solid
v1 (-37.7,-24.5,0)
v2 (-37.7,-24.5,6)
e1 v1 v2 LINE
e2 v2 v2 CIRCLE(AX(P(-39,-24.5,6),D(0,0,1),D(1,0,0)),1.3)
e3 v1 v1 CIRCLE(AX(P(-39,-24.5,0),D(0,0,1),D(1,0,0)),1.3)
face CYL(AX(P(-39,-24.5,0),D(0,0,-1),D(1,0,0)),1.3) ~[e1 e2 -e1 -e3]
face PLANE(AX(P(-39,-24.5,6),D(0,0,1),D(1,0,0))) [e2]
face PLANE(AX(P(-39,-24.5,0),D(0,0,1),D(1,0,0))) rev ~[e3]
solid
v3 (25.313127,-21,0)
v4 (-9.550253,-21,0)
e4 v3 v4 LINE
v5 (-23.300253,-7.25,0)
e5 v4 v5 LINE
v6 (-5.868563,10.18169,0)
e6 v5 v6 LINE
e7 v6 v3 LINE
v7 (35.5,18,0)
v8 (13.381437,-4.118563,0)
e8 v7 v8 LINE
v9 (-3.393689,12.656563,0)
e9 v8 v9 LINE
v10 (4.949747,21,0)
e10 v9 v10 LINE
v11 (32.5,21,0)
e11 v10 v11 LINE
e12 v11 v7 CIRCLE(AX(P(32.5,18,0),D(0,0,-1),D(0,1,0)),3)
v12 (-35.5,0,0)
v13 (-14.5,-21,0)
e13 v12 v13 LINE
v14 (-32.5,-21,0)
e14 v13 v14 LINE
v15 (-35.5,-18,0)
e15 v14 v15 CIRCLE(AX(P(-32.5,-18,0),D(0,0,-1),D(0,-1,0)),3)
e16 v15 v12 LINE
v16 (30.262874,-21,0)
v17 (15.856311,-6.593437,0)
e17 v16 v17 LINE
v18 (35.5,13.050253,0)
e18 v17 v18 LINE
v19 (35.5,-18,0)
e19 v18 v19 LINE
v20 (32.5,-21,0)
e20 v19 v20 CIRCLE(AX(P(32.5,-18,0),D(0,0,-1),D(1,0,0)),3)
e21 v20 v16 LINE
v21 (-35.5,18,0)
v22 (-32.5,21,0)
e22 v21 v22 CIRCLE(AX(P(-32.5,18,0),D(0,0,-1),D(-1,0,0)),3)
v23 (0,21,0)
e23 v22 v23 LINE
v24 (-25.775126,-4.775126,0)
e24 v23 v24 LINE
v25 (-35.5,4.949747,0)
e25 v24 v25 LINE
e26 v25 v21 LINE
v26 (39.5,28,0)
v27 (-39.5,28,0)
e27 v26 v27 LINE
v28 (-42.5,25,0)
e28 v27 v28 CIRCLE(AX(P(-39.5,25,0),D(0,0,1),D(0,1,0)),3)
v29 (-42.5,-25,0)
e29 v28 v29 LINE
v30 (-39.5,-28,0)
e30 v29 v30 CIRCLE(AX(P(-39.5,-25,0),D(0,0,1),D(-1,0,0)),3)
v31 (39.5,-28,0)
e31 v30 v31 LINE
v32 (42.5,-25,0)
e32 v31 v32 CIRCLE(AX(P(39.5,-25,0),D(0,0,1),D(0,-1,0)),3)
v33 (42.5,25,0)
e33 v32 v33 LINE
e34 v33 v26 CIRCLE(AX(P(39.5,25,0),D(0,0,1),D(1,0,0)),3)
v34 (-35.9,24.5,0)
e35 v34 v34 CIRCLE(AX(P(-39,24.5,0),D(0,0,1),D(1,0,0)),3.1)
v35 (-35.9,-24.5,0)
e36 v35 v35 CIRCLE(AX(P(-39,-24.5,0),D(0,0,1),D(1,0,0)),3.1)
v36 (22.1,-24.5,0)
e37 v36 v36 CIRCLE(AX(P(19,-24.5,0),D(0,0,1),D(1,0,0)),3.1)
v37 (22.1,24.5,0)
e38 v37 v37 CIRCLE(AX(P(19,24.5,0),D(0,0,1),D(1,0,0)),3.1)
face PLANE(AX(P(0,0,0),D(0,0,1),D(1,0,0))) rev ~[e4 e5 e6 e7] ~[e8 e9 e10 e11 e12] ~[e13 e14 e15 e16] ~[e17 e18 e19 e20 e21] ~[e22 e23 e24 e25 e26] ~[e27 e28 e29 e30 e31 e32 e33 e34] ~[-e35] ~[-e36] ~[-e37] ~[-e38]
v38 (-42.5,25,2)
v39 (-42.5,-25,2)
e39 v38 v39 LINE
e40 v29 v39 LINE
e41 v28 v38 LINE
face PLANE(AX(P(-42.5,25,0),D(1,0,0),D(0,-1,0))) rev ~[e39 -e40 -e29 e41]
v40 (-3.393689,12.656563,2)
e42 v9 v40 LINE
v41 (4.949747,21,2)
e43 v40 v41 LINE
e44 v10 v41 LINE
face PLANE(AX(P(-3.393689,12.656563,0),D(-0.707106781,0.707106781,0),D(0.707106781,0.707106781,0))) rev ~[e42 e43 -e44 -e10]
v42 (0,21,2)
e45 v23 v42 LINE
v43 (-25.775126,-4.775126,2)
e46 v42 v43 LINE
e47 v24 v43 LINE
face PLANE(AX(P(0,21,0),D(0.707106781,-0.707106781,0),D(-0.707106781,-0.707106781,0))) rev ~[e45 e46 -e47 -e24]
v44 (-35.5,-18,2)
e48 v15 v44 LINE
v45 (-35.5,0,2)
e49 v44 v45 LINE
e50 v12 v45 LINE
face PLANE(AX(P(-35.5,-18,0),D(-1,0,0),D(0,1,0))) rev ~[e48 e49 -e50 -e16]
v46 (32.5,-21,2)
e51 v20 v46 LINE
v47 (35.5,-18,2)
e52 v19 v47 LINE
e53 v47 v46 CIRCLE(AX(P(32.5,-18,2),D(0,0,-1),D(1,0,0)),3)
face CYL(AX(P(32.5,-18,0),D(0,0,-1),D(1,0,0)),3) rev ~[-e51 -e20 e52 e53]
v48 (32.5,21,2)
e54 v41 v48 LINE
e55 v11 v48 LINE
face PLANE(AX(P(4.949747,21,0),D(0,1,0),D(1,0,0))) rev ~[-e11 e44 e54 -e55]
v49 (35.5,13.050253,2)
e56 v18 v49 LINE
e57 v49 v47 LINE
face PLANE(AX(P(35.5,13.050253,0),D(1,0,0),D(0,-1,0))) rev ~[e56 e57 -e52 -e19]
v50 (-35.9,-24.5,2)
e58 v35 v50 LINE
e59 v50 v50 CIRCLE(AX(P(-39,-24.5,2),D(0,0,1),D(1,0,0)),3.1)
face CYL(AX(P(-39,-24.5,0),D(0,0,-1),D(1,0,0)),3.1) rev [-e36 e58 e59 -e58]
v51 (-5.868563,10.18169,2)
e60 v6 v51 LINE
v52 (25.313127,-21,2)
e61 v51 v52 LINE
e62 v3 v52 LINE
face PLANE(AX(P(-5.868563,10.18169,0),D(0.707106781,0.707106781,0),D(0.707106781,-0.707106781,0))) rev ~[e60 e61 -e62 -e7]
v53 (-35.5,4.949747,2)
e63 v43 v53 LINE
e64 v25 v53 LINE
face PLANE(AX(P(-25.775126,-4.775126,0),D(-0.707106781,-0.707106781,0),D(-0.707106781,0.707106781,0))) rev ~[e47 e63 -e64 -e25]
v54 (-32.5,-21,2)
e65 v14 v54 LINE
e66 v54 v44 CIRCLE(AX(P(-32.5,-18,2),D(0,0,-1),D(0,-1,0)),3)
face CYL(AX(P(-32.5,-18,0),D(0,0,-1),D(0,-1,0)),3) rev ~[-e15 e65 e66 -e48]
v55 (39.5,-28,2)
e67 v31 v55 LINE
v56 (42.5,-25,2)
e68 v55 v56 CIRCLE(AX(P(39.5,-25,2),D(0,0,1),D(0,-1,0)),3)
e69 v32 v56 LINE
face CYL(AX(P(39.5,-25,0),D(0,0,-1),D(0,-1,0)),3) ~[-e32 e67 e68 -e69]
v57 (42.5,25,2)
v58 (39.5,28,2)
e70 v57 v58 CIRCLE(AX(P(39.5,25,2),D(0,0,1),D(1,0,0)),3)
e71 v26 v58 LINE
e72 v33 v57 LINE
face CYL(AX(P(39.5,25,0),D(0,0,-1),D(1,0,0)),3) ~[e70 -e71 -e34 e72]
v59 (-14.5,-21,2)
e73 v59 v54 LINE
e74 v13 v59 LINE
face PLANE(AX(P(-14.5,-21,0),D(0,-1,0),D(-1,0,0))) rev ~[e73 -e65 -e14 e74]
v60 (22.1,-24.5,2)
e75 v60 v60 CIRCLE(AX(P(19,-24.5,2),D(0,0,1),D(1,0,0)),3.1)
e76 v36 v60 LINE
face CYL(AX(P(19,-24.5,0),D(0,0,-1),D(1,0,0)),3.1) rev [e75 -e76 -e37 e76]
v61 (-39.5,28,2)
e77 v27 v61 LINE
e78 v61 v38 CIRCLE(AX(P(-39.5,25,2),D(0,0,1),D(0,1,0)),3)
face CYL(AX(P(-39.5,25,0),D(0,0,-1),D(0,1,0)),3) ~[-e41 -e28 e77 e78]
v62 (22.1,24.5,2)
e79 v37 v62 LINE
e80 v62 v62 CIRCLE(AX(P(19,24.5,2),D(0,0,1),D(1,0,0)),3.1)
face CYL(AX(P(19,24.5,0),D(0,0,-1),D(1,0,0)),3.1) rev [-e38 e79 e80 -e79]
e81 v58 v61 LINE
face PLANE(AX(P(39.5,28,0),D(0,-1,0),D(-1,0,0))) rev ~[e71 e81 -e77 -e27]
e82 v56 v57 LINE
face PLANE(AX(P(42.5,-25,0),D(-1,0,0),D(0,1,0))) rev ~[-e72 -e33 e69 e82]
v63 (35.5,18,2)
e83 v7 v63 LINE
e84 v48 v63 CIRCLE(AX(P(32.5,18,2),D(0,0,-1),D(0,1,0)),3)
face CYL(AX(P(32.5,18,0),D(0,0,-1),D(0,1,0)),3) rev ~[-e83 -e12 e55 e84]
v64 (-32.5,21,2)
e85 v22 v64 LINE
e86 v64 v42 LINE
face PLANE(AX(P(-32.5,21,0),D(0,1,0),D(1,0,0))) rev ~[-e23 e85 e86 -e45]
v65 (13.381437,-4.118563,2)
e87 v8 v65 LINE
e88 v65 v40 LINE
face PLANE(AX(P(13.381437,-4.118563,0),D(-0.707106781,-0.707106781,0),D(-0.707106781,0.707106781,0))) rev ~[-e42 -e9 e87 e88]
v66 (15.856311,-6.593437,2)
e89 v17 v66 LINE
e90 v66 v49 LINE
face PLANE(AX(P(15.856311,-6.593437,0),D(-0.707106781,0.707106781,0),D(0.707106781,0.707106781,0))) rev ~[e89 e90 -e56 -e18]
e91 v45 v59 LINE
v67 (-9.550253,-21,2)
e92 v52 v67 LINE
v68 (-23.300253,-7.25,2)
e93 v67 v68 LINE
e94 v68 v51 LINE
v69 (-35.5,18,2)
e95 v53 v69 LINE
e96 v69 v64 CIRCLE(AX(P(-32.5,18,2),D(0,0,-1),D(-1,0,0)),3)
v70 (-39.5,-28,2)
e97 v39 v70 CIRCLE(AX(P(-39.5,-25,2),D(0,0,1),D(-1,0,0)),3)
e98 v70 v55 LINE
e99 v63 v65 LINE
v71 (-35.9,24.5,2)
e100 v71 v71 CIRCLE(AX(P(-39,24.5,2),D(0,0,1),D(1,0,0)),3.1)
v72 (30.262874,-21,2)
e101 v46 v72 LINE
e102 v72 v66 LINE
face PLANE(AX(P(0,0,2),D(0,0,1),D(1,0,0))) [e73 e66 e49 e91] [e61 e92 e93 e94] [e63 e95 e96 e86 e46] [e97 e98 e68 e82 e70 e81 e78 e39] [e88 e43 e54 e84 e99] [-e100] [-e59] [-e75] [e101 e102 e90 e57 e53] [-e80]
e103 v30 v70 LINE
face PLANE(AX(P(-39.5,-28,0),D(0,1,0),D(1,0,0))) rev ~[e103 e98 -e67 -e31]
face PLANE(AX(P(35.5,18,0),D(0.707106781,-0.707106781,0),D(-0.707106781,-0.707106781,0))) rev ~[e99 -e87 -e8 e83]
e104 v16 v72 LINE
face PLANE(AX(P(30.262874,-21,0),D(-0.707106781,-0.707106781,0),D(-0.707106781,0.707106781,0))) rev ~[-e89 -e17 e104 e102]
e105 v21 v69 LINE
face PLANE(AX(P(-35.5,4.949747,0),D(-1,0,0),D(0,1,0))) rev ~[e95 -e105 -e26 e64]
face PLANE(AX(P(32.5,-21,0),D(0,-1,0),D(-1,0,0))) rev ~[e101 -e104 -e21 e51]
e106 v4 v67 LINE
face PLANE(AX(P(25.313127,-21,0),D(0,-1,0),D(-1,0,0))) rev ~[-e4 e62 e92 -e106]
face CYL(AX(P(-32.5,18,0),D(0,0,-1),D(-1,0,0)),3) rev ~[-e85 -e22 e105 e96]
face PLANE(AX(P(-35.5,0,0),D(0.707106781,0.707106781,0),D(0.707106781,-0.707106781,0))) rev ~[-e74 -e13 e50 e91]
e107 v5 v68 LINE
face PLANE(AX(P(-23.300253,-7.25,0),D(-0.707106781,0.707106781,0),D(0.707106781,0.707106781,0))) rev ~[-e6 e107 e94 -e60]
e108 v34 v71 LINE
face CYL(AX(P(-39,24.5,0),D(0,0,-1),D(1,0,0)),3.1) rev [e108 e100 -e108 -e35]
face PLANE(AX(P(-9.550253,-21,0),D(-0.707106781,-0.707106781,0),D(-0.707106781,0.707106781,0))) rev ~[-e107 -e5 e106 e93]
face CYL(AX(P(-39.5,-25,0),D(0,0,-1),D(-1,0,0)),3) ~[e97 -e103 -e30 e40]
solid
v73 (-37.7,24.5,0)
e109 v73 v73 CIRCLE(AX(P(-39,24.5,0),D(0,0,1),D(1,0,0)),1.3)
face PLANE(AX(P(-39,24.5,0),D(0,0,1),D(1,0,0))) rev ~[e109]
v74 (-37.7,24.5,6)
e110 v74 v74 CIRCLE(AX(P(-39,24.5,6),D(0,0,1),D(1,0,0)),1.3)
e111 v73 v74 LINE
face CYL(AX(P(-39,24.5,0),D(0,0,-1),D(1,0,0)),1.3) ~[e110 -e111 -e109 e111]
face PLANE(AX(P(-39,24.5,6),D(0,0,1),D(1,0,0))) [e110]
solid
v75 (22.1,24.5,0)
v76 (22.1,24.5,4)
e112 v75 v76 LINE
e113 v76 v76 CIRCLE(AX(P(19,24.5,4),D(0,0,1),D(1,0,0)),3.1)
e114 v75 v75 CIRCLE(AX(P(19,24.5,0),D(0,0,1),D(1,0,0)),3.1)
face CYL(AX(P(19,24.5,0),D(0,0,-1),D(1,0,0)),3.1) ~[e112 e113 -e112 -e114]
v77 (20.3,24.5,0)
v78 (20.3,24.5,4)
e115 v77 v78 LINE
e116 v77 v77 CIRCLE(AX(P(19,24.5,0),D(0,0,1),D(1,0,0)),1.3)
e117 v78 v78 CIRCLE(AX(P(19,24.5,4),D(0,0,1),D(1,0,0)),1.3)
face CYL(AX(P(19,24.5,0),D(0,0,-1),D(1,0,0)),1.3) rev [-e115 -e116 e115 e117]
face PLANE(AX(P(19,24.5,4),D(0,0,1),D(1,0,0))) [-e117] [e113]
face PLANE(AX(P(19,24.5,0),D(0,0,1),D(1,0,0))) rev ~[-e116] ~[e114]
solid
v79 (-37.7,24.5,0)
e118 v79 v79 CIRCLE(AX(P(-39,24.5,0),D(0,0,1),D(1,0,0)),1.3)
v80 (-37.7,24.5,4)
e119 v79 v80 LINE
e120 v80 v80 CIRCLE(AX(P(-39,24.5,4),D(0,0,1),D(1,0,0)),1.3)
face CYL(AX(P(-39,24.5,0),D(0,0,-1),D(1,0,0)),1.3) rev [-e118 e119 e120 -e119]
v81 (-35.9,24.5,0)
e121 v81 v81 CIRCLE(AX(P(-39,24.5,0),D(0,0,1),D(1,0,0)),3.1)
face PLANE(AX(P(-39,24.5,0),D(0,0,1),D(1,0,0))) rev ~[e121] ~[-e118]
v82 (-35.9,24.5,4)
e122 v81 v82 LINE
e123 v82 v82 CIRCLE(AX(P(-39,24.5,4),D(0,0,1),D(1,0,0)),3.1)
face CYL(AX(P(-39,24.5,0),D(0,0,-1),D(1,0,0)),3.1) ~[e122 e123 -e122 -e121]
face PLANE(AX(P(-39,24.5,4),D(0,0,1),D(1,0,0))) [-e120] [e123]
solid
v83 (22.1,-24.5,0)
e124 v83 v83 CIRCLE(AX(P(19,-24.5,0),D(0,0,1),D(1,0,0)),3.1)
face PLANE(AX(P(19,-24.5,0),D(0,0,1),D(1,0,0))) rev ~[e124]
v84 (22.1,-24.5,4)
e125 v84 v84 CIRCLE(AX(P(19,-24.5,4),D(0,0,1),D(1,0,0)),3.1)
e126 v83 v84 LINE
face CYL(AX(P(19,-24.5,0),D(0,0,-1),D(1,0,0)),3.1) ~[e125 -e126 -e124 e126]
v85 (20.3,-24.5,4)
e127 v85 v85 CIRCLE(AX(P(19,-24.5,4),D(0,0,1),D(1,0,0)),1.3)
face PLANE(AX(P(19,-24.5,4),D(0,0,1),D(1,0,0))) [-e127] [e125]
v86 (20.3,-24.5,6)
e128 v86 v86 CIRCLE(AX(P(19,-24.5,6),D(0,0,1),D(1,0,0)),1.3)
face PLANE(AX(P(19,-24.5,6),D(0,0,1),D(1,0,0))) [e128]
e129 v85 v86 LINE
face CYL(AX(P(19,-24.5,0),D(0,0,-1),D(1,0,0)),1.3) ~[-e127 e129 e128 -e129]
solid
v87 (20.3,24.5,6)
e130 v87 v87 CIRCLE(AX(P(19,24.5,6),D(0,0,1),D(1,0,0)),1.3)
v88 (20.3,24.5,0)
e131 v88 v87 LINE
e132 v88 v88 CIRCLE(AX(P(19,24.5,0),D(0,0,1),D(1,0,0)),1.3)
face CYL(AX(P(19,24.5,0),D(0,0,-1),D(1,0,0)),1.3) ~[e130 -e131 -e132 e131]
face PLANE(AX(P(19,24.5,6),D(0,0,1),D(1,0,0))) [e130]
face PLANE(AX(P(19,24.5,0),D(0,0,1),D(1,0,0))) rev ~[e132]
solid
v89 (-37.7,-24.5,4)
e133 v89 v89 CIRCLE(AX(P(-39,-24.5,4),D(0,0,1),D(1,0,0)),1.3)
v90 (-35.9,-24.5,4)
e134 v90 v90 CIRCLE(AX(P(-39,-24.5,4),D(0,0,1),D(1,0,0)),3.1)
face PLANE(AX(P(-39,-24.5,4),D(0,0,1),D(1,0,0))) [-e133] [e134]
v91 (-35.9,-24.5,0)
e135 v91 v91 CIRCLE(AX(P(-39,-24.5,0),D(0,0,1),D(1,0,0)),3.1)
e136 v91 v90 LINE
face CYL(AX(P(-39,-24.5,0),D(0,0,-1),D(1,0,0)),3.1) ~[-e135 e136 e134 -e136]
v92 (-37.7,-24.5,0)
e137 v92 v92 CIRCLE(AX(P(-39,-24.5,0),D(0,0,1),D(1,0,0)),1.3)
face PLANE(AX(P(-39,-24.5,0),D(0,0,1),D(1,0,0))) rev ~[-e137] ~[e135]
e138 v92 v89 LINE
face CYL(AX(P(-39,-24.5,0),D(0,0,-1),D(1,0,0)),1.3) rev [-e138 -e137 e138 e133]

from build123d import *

# Parameters (mm, degrees)
F0_R     = 3.1
F0_R_2   = 1.3
F1_DEPTH = 4
F2_DEPTH = 2
F3_DEPTH = 6


with BuildPart() as f1:
    # F0 (on Top) → F1 (new body)
    with BuildSketch(Plane.XY):
        with Locations((-39, -24.5)):
            Circle(F0_R)
        with Locations((-39, -24.5)):
            Circle(F0_R_2, mode=Mode.SUBTRACT)
    extrude(amount=F1_DEPTH)


with BuildPart() as f1b:
    # F0 (on Top) → F1, piece 2 (new body)
    with BuildSketch(Plane.XY):
        with Locations((19, -24.5)):
            Circle(F0_R)
        with Locations((19, -24.5)):
            Circle(F0_R_2, mode=Mode.SUBTRACT)
    extrude(amount=F1_DEPTH)

    # F0 (on Top) → F3 (join)
    with BuildSketch(Plane.XY):
        with Locations((19, -24.5)):
            Circle(F0_R_2)
    extrude(amount=F3_DEPTH)


with BuildPart() as f1c:
    # F0 (on Top) → F1, piece 3 (new body)
    with BuildSketch(Plane.XY):
        with Locations((-39, 24.5)):
            Circle(F0_R)
        with Locations((-39, 24.5)):
            Circle(F0_R_2, mode=Mode.SUBTRACT)
    extrude(amount=F1_DEPTH)


with BuildPart() as f1d:
    # F0 (on Top) → F1, piece 4 (new body)
    with BuildSketch(Plane.XY):
        with Locations((19, 24.5)):
            Circle(F0_R)
        with Locations((19, 24.5)):
            Circle(F0_R_2, mode=Mode.SUBTRACT)
    extrude(amount=F1_DEPTH)


with BuildPart() as f2:
    # F0 (on Top) → F2 (new body)
    with BuildSketch(Plane.XY):
        with BuildLine():
            Line((39.5, 28), (-39.5, 28))
            ThreePointArc((-39.5, 28), (-41.6213203436, 27.1213203436), (-42.5, 25))
            Line((-42.5, 25), (-42.5, -25))
            ThreePointArc((-42.5, -25), (-41.6213203436, -27.1213203436), (-39.5, -28))
            Line((-39.5, -28), (39.5, -28))
            ThreePointArc((39.5, -28), (41.6213203436, -27.1213203436), (42.5, -25))
            Line((42.5, -25), (42.5, 25))
            ThreePointArc((42.5, 25), (41.6213203436, 27.1213203436), (39.5, 28))
        make_face()
        with Locations((-39, -24.5)):
            Circle(F0_R, mode=Mode.SUBTRACT)
        with Locations((19, -24.5)):
            Circle(F0_R, mode=Mode.SUBTRACT)
        with Locations((-39, 24.5)):
            Circle(F0_R, mode=Mode.SUBTRACT)
        with BuildLine():
            ThreePointArc((-35.5, 18), (-34.6213203436, 20.1213203436), (-32.5, 21))
            Line((-32.5, 21), (0, 21))
            Line((0, 21), (4.9497474683, 21))
            Line((4.9497474683, 21), (32.5, 21))
            ThreePointArc((32.5, 21), (34.6213203436, 20.1213203436), (35.5, 18))
            Line((35.5, 18), (35.5, 13.0502525317))
            Line((35.5, 13.0502525317), (35.5, -18))
            ThreePointArc((35.5, -18), (34.6213203436, -20.1213203436), (32.5, -21))
            Line((32.5, -21), (30.2628741404, -21))
            Line((30.2628741404, -21), (25.3131266721, -21))
            Line((25.3131266721, -21), (-9.5502525317, -21))
            Line((-9.5502525317, -21), (-14.5, -21))
            Line((-14.5, -21), (-32.5, -21))
            ThreePointArc((-32.5, -21), (-34.6213203436, -20.1213203436), (-35.5, -18))
            Line((-35.5, -18), (-35.5, 0))
            Line((-35.5, 0), (-35.5, 4.9497474683))
            Line((-35.5, 4.9497474683), (-35.5, 18))
        make_face(mode=Mode.SUBTRACT)
        with Locations((19, 24.5)):
            Circle(F0_R, mode=Mode.SUBTRACT)
        Polygon((4.9497474683, 21), (0, 21), (-25.7751262658, -4.7751262658), (-23.3002525317, -7.25), (-5.8685629298, 10.1816896019), (-3.3936891957, 12.656563336), align=None)
        Polygon((-23.3002525317, -7.25), (-25.7751262658, -4.7751262658), (-35.5, 4.9497474683), (-35.5, 0), (-14.5, -21), (-9.5502525317, -21), align=None)
        Polygon((13.3814370702, -4.1185629298), (-3.3936891957, 12.656563336), (-5.8685629298, 10.1816896019), (25.3131266721, -21), (30.2628741404, -21), (15.8563108043, -6.593436664), align=None)
        Polygon((35.5, 13.0502525317), (35.5, 18), (13.3814370702, -4.1185629298), (15.8563108043, -6.593436664), align=None)
    extrude(amount=F2_DEPTH)


with BuildPart() as f3:
    # F0 (on Top) → F3, piece 2 (new body)
    with BuildSketch(Plane.XY):
        with Locations((-39, -24.5)):
            Circle(F0_R_2)
    extrude(amount=F3_DEPTH)


with BuildPart() as f3b:
    # F0 (on Top) → F3, piece 3 (new body)
    with BuildSketch(Plane.XY):
        with Locations((-39, 24.5)):
            Circle(F0_R_2)
    extrude(amount=F3_DEPTH)


with BuildPart() as f3c:
    # F0 (on Top) → F3, piece 4 (new body)
    with BuildSketch(Plane.XY):
        with Locations((19, 24.5)):
            Circle(F0_R_2)
    extrude(amount=F3_DEPTH)


solid = Compound([f1.part, f1b.part, f1c.part, f1d.part, f2.part, f3.part, f3b.part, f3c.part])
